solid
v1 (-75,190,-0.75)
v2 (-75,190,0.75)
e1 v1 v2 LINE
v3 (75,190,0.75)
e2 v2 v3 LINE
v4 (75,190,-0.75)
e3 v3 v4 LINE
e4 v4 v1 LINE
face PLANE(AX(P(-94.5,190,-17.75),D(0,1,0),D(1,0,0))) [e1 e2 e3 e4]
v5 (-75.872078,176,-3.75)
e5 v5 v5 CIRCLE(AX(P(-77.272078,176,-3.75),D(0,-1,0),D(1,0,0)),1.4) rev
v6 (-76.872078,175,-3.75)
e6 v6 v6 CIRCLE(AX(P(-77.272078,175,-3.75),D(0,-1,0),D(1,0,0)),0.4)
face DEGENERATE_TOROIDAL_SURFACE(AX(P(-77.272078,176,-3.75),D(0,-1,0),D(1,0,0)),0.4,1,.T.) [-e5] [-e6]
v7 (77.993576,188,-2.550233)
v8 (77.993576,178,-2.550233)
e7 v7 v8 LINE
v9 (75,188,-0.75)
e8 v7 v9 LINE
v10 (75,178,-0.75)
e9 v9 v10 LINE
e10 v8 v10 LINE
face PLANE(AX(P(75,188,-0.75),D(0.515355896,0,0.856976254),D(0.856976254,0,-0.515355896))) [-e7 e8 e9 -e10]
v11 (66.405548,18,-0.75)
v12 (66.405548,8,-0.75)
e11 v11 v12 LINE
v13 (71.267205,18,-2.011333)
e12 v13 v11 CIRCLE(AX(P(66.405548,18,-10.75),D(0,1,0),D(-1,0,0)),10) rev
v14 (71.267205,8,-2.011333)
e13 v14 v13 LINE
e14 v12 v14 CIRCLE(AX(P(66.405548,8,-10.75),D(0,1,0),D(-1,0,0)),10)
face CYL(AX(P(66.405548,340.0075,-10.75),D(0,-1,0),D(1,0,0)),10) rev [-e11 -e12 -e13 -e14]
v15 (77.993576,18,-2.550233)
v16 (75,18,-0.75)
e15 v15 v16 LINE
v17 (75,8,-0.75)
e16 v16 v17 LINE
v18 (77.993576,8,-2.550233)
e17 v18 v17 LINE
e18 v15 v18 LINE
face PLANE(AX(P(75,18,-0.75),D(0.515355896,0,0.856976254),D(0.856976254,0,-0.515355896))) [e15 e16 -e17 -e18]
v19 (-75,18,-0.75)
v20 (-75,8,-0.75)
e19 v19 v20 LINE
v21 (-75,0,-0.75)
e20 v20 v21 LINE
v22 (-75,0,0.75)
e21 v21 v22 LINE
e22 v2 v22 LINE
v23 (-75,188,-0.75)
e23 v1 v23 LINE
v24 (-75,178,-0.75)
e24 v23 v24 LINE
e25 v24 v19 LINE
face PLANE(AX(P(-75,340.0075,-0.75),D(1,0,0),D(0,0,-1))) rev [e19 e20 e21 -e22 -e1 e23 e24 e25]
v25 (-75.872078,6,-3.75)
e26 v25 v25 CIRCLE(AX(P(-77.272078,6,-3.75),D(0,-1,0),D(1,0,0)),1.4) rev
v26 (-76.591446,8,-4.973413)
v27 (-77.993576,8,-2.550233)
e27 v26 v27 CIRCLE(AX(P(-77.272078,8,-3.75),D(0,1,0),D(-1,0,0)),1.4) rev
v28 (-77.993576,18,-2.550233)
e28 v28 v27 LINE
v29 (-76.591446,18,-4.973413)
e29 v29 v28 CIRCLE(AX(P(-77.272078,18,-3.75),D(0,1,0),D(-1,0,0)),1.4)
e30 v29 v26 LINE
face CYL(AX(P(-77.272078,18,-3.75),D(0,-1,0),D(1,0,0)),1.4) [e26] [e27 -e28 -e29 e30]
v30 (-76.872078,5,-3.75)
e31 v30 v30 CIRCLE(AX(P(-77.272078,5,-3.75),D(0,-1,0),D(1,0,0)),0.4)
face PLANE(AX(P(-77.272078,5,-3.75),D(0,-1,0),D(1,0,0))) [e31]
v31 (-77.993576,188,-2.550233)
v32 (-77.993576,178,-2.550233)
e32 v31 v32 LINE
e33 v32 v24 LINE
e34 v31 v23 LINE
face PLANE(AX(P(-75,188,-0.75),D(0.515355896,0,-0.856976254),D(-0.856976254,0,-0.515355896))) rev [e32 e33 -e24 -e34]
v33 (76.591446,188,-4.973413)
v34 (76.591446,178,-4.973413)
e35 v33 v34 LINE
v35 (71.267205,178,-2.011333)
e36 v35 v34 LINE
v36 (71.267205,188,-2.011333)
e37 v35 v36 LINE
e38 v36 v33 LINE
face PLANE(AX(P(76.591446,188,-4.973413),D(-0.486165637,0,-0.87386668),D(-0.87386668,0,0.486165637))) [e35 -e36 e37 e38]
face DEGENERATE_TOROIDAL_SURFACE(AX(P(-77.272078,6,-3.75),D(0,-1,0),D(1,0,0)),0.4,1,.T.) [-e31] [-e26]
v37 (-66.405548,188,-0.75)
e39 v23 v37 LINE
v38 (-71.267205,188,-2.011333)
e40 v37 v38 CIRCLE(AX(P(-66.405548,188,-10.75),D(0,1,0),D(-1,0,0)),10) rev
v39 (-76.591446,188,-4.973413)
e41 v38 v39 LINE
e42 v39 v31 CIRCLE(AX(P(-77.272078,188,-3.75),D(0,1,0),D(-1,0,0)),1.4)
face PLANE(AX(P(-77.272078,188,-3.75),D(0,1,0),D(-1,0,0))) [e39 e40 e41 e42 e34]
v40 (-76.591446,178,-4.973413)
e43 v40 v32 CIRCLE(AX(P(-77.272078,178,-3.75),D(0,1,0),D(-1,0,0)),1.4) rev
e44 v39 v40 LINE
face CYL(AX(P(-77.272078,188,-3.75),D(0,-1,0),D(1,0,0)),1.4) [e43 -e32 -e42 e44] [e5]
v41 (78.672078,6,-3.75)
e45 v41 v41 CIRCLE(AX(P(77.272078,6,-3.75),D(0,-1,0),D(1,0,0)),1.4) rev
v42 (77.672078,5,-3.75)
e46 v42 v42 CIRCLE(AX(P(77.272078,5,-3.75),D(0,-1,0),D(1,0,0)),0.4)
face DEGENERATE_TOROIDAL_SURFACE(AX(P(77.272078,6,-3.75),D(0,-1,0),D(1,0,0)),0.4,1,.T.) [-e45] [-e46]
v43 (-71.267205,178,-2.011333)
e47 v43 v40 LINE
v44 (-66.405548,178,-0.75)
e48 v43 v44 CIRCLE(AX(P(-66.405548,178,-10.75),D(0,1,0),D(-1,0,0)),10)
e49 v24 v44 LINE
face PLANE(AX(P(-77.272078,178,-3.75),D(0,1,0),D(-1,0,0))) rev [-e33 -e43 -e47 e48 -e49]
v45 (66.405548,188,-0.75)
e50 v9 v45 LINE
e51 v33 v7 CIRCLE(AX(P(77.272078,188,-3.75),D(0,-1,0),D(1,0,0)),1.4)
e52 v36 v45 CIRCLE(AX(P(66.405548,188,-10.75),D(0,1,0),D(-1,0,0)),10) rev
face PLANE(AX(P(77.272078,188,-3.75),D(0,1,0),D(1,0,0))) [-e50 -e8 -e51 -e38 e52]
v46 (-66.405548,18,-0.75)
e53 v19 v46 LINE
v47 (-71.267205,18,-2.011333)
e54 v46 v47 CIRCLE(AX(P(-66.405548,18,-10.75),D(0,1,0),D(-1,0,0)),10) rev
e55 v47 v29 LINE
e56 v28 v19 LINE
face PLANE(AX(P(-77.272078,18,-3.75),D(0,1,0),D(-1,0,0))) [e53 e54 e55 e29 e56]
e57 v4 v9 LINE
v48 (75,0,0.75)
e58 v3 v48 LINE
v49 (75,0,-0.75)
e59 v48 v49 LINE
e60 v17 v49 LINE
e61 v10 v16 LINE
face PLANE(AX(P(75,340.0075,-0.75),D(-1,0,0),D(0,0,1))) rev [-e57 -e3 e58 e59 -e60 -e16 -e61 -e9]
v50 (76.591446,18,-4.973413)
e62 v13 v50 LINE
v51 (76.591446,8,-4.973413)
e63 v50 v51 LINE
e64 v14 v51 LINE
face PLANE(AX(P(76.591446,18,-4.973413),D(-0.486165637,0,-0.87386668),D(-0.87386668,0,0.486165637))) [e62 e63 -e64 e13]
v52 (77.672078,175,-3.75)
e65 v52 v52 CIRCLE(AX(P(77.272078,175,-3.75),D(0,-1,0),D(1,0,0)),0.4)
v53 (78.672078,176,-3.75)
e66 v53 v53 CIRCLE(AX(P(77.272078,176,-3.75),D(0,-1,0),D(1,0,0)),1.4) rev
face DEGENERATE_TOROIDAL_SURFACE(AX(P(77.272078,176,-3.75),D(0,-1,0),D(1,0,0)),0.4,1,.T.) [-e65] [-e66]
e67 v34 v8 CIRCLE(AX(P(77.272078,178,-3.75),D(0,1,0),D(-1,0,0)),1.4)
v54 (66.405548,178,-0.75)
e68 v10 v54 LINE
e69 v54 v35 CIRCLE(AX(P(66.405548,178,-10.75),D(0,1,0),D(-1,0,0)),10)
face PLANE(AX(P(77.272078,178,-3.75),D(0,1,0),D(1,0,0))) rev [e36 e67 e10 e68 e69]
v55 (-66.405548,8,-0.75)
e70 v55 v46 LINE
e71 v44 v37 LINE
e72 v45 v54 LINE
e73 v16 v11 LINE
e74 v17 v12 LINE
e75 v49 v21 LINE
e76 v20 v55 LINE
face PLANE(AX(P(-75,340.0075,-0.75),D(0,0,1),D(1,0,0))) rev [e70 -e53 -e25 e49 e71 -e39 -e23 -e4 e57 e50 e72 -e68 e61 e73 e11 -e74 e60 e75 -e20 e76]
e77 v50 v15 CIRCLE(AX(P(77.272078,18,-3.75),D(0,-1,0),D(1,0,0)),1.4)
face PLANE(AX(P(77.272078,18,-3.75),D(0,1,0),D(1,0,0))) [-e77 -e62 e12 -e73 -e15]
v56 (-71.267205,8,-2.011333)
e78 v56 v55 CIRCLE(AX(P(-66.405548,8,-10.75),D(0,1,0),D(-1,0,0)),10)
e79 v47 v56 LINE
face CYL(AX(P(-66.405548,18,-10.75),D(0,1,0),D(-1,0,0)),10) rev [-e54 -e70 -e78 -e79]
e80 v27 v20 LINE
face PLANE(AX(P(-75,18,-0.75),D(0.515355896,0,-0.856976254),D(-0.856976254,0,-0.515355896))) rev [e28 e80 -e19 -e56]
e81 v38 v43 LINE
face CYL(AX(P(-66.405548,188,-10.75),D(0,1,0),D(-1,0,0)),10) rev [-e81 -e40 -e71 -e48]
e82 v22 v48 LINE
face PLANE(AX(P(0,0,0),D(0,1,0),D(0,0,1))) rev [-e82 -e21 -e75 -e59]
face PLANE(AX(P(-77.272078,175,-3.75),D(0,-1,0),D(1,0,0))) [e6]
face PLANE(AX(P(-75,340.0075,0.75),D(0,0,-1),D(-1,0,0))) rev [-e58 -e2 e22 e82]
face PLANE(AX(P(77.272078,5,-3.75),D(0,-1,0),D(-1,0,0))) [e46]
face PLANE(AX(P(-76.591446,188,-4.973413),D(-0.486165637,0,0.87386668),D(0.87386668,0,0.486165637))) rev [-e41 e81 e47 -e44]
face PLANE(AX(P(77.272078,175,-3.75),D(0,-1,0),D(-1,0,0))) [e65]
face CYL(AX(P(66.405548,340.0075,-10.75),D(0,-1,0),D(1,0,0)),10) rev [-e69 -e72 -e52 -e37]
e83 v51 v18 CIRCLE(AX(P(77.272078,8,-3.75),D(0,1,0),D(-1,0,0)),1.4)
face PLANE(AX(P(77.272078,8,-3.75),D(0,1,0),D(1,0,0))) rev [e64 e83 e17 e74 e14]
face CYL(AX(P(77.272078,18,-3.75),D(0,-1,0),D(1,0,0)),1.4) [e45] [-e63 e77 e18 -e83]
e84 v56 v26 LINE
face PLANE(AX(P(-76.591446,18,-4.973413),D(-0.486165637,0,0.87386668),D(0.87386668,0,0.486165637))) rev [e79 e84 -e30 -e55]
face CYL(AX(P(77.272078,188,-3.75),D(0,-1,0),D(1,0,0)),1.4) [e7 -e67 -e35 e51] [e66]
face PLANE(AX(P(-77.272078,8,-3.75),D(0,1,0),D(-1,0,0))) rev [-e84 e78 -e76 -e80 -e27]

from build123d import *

# Parameters (mm, degrees)
SKETCH1_W            = 150
SKETCH1_H            = 1.5
BOSS_EXTRUDE1_DEPTH  = 190
BOSS_EXTRUDE2_DEPTH  = 10
BOSS_EXTRUDE3_START  = 3
SKETCH3_R            = 1.4
BOSS_EXTRUDE3_DEPTH  = 3
FILLET1_R            = 1
FILLET2_R            = 10
FILLET1_OF_MIRROR2_R = 1
FILLET2_OF_MIRROR2_R = 10
LPATTERN1_START      = 175.9999999
LPATTERN1_OUTLINE_R  = 1.4
LPATTERN1_DEPTH      = 12.0000001
LPATTERN1_START_2    = 178
LPATTERN1_2_DEPTH    = 10


with BuildPart() as part:
    # Sketch1 → Boss-Extrude1 (new body)
    with BuildSketch(Plane(origin=(0, 0, 0), x_dir=(1, 0, 0), z_dir=(0, 1, 0))):
        Rectangle(SKETCH1_W, SKETCH1_H)
    extrude(amount=BOSS_EXTRUDE1_DEPTH)

    # Sketch2 → Boss-Extrude2 (add)
    with BuildSketch(Plane(origin=(0, 8, 0), x_dir=(1, 0, 0), z_dir=(0, 1, 0))):
        with BuildLine():
            Line((-75, 0.75), (-77.993576193, 2.550233244))
            ThreePointArc((-77.993576193, 2.550233244), (-78.48384028, 4.451164765), (-76.591446047, 4.973413351))
            Line((-76.591446047, 4.973413351), (-69, 0.75))
            Line((-69, 0.75), (-75, 0.75))
        make_face()
    boss_extrude2 = extrude(amount=BOSS_EXTRUDE2_DEPTH)

    # Sketch3 → Boss-Extrude3 (add)
    with BuildSketch(Plane(origin=(0, 8, 0), x_dir=(-1, 0, 0), z_dir=(0, -1, 0)).offset(BOSS_EXTRUDE3_START)):
        with Locations(Location((77.272077939, 3.75, 0), (0, 0, 180))):
            Circle(SKETCH3_R)
    boss_extrude3 = extrude(amount=-BOSS_EXTRUDE3_DEPTH)

    # Fillet1
    fillet1_edges = [part.edges().sort_by_distance(p)[0] for p in [
        (-78.672077939, 5, -3.75),
    ]]
    fillet(fillet1_edges, radius=FILLET1_R)

    # Fillet2
    fillet2_edges = [part.edges().sort_by_distance(p)[0] for p in [
        (-69, 13, -0.75),
    ]]
    fillet(fillet2_edges, radius=FILLET2_R)

    # Mirror2: Boss-Extrude2, Boss-Extrude3 across plane
    add(boss_extrude2.mirror(Plane(origin=(0, 0, 0), x_dir=(0, 0, 1), z_dir=(1, 0, 0))))
    add(boss_extrude3.mirror(Plane(origin=(0, 0, 0), x_dir=(0, 0, 1), z_dir=(1, 0, 0))))

    # Fillet1 of Mirror2
    fillet1_of_mirror2_edges = [part.edges().sort_by_distance(p)[0] for p in [
        (78.672077939, 5, -3.75),
    ]]
    fillet(fillet1_of_mirror2_edges, radius=FILLET1_OF_MIRROR2_R)

    # Fillet2 of Mirror2
    fillet2_of_mirror2_edges = [part.edges().sort_by_distance(p)[0] for p in [
        (69, 13, -0.75),
    ]]
    fillet(fillet2_of_mirror2_edges, radius=FILLET2_OF_MIRROR2_R)



with BuildPart() as body_2:
    # LPattern1: read off the stored shape, not the designer's step
    # LPattern1 outline → LPattern1 (new body)
    with BuildSketch(Plane(origin=(0, 0, 0), x_dir=(1, 0, 0), z_dir=(0, 1, 0)).offset(LPATTERN1_START)):
        with Locations((-77.272077939, 3.75)):
            Circle(LPATTERN1_OUTLINE_R)
        with Locations((77.272077939, 3.75)):
            Circle(LPATTERN1_OUTLINE_R)
    extrude(amount=LPATTERN1_DEPTH)


with BuildPart() as part_1:
    add(part.part)

    add(body_2.part)  # LPattern1 2 merges body 2
    # LPattern1 2 outline → LPattern1 2 (add)
    with BuildSketch(Plane(origin=(0, 0, 0), x_dir=(1, 0, 0), z_dir=(0, 1, 0)).offset(LPATTERN1_START_2)):
        with BuildLine():
            ThreePointArc((71.267204788, 2.011333205), (68.916856052, 1.070468298), (66.40554842, 0.75))
            Line((66.40554842, 0.75), (75, 0.75))
            Line((75, 0.75), (77.993576193, 2.550233244))
            ThreePointArc((77.993576193, 2.550233244), (76.060315597, 3.048835235), (76.591446047, 4.973413351))
            Line((76.591446047, 4.973413351), (71.267204788, 2.011333205))
        make_face()
        with BuildLine():
            Line((-71.267204788, 2.011333205), (-76.591446047, 4.973413351))
            ThreePointArc((-76.591446047, 4.973413351), (-76.060315597, 3.048835235), (-77.993576193, 2.550233244))
            Line((-77.993576193, 2.550233244), (-75, 0.75))
            Line((-75, 0.75), (-66.40554842, 0.75))
            ThreePointArc((-66.40554842, 0.75), (-68.916856052, 1.070468298), (-71.267204788, 2.011333205))
        make_face()
    extrude(amount=LPATTERN1_2_DEPTH)

    # LPattern1 3 outline → LPattern1 3 (revolve)
    with BuildSketch(Plane(origin=(77.272077939, 0, -3.75), x_dir=(1, 0, 0), z_dir=(0, 0, 1))):
        with BuildLine():
            Line((0, 175.9999999), (0, 175))
            Line((0, 175), (0.4, 175))
            ThreePointArc((0.4, 175), (1.107106781, 175.292893219), (1.4, 176))
            Line((1.4, 176), (0, 175.9999999))
        make_face()
    revolve(axis=Axis((77.272077939, 0, -3.75), (0, 1, 0)))

    # LPattern1 4 outline → LPattern1 4 (revolve)
    with BuildSketch(Plane(origin=(-77.272077939, 0, -3.75), x_dir=(1, 0, 0), z_dir=(0, 0, 1))):
        with BuildLine():
            Line((0, 175.9999999), (0, 175))
            Line((0, 175), (0.4, 175))
            ThreePointArc((0.4, 175), (1.107106781, 175.292893219), (1.4, 176))
            Line((1.4, 176), (0, 175.9999999))
        make_face()
    revolve(axis=Axis((-77.272077939, 0, -3.75), (0, 1, 0)))


solid = part_1.part
